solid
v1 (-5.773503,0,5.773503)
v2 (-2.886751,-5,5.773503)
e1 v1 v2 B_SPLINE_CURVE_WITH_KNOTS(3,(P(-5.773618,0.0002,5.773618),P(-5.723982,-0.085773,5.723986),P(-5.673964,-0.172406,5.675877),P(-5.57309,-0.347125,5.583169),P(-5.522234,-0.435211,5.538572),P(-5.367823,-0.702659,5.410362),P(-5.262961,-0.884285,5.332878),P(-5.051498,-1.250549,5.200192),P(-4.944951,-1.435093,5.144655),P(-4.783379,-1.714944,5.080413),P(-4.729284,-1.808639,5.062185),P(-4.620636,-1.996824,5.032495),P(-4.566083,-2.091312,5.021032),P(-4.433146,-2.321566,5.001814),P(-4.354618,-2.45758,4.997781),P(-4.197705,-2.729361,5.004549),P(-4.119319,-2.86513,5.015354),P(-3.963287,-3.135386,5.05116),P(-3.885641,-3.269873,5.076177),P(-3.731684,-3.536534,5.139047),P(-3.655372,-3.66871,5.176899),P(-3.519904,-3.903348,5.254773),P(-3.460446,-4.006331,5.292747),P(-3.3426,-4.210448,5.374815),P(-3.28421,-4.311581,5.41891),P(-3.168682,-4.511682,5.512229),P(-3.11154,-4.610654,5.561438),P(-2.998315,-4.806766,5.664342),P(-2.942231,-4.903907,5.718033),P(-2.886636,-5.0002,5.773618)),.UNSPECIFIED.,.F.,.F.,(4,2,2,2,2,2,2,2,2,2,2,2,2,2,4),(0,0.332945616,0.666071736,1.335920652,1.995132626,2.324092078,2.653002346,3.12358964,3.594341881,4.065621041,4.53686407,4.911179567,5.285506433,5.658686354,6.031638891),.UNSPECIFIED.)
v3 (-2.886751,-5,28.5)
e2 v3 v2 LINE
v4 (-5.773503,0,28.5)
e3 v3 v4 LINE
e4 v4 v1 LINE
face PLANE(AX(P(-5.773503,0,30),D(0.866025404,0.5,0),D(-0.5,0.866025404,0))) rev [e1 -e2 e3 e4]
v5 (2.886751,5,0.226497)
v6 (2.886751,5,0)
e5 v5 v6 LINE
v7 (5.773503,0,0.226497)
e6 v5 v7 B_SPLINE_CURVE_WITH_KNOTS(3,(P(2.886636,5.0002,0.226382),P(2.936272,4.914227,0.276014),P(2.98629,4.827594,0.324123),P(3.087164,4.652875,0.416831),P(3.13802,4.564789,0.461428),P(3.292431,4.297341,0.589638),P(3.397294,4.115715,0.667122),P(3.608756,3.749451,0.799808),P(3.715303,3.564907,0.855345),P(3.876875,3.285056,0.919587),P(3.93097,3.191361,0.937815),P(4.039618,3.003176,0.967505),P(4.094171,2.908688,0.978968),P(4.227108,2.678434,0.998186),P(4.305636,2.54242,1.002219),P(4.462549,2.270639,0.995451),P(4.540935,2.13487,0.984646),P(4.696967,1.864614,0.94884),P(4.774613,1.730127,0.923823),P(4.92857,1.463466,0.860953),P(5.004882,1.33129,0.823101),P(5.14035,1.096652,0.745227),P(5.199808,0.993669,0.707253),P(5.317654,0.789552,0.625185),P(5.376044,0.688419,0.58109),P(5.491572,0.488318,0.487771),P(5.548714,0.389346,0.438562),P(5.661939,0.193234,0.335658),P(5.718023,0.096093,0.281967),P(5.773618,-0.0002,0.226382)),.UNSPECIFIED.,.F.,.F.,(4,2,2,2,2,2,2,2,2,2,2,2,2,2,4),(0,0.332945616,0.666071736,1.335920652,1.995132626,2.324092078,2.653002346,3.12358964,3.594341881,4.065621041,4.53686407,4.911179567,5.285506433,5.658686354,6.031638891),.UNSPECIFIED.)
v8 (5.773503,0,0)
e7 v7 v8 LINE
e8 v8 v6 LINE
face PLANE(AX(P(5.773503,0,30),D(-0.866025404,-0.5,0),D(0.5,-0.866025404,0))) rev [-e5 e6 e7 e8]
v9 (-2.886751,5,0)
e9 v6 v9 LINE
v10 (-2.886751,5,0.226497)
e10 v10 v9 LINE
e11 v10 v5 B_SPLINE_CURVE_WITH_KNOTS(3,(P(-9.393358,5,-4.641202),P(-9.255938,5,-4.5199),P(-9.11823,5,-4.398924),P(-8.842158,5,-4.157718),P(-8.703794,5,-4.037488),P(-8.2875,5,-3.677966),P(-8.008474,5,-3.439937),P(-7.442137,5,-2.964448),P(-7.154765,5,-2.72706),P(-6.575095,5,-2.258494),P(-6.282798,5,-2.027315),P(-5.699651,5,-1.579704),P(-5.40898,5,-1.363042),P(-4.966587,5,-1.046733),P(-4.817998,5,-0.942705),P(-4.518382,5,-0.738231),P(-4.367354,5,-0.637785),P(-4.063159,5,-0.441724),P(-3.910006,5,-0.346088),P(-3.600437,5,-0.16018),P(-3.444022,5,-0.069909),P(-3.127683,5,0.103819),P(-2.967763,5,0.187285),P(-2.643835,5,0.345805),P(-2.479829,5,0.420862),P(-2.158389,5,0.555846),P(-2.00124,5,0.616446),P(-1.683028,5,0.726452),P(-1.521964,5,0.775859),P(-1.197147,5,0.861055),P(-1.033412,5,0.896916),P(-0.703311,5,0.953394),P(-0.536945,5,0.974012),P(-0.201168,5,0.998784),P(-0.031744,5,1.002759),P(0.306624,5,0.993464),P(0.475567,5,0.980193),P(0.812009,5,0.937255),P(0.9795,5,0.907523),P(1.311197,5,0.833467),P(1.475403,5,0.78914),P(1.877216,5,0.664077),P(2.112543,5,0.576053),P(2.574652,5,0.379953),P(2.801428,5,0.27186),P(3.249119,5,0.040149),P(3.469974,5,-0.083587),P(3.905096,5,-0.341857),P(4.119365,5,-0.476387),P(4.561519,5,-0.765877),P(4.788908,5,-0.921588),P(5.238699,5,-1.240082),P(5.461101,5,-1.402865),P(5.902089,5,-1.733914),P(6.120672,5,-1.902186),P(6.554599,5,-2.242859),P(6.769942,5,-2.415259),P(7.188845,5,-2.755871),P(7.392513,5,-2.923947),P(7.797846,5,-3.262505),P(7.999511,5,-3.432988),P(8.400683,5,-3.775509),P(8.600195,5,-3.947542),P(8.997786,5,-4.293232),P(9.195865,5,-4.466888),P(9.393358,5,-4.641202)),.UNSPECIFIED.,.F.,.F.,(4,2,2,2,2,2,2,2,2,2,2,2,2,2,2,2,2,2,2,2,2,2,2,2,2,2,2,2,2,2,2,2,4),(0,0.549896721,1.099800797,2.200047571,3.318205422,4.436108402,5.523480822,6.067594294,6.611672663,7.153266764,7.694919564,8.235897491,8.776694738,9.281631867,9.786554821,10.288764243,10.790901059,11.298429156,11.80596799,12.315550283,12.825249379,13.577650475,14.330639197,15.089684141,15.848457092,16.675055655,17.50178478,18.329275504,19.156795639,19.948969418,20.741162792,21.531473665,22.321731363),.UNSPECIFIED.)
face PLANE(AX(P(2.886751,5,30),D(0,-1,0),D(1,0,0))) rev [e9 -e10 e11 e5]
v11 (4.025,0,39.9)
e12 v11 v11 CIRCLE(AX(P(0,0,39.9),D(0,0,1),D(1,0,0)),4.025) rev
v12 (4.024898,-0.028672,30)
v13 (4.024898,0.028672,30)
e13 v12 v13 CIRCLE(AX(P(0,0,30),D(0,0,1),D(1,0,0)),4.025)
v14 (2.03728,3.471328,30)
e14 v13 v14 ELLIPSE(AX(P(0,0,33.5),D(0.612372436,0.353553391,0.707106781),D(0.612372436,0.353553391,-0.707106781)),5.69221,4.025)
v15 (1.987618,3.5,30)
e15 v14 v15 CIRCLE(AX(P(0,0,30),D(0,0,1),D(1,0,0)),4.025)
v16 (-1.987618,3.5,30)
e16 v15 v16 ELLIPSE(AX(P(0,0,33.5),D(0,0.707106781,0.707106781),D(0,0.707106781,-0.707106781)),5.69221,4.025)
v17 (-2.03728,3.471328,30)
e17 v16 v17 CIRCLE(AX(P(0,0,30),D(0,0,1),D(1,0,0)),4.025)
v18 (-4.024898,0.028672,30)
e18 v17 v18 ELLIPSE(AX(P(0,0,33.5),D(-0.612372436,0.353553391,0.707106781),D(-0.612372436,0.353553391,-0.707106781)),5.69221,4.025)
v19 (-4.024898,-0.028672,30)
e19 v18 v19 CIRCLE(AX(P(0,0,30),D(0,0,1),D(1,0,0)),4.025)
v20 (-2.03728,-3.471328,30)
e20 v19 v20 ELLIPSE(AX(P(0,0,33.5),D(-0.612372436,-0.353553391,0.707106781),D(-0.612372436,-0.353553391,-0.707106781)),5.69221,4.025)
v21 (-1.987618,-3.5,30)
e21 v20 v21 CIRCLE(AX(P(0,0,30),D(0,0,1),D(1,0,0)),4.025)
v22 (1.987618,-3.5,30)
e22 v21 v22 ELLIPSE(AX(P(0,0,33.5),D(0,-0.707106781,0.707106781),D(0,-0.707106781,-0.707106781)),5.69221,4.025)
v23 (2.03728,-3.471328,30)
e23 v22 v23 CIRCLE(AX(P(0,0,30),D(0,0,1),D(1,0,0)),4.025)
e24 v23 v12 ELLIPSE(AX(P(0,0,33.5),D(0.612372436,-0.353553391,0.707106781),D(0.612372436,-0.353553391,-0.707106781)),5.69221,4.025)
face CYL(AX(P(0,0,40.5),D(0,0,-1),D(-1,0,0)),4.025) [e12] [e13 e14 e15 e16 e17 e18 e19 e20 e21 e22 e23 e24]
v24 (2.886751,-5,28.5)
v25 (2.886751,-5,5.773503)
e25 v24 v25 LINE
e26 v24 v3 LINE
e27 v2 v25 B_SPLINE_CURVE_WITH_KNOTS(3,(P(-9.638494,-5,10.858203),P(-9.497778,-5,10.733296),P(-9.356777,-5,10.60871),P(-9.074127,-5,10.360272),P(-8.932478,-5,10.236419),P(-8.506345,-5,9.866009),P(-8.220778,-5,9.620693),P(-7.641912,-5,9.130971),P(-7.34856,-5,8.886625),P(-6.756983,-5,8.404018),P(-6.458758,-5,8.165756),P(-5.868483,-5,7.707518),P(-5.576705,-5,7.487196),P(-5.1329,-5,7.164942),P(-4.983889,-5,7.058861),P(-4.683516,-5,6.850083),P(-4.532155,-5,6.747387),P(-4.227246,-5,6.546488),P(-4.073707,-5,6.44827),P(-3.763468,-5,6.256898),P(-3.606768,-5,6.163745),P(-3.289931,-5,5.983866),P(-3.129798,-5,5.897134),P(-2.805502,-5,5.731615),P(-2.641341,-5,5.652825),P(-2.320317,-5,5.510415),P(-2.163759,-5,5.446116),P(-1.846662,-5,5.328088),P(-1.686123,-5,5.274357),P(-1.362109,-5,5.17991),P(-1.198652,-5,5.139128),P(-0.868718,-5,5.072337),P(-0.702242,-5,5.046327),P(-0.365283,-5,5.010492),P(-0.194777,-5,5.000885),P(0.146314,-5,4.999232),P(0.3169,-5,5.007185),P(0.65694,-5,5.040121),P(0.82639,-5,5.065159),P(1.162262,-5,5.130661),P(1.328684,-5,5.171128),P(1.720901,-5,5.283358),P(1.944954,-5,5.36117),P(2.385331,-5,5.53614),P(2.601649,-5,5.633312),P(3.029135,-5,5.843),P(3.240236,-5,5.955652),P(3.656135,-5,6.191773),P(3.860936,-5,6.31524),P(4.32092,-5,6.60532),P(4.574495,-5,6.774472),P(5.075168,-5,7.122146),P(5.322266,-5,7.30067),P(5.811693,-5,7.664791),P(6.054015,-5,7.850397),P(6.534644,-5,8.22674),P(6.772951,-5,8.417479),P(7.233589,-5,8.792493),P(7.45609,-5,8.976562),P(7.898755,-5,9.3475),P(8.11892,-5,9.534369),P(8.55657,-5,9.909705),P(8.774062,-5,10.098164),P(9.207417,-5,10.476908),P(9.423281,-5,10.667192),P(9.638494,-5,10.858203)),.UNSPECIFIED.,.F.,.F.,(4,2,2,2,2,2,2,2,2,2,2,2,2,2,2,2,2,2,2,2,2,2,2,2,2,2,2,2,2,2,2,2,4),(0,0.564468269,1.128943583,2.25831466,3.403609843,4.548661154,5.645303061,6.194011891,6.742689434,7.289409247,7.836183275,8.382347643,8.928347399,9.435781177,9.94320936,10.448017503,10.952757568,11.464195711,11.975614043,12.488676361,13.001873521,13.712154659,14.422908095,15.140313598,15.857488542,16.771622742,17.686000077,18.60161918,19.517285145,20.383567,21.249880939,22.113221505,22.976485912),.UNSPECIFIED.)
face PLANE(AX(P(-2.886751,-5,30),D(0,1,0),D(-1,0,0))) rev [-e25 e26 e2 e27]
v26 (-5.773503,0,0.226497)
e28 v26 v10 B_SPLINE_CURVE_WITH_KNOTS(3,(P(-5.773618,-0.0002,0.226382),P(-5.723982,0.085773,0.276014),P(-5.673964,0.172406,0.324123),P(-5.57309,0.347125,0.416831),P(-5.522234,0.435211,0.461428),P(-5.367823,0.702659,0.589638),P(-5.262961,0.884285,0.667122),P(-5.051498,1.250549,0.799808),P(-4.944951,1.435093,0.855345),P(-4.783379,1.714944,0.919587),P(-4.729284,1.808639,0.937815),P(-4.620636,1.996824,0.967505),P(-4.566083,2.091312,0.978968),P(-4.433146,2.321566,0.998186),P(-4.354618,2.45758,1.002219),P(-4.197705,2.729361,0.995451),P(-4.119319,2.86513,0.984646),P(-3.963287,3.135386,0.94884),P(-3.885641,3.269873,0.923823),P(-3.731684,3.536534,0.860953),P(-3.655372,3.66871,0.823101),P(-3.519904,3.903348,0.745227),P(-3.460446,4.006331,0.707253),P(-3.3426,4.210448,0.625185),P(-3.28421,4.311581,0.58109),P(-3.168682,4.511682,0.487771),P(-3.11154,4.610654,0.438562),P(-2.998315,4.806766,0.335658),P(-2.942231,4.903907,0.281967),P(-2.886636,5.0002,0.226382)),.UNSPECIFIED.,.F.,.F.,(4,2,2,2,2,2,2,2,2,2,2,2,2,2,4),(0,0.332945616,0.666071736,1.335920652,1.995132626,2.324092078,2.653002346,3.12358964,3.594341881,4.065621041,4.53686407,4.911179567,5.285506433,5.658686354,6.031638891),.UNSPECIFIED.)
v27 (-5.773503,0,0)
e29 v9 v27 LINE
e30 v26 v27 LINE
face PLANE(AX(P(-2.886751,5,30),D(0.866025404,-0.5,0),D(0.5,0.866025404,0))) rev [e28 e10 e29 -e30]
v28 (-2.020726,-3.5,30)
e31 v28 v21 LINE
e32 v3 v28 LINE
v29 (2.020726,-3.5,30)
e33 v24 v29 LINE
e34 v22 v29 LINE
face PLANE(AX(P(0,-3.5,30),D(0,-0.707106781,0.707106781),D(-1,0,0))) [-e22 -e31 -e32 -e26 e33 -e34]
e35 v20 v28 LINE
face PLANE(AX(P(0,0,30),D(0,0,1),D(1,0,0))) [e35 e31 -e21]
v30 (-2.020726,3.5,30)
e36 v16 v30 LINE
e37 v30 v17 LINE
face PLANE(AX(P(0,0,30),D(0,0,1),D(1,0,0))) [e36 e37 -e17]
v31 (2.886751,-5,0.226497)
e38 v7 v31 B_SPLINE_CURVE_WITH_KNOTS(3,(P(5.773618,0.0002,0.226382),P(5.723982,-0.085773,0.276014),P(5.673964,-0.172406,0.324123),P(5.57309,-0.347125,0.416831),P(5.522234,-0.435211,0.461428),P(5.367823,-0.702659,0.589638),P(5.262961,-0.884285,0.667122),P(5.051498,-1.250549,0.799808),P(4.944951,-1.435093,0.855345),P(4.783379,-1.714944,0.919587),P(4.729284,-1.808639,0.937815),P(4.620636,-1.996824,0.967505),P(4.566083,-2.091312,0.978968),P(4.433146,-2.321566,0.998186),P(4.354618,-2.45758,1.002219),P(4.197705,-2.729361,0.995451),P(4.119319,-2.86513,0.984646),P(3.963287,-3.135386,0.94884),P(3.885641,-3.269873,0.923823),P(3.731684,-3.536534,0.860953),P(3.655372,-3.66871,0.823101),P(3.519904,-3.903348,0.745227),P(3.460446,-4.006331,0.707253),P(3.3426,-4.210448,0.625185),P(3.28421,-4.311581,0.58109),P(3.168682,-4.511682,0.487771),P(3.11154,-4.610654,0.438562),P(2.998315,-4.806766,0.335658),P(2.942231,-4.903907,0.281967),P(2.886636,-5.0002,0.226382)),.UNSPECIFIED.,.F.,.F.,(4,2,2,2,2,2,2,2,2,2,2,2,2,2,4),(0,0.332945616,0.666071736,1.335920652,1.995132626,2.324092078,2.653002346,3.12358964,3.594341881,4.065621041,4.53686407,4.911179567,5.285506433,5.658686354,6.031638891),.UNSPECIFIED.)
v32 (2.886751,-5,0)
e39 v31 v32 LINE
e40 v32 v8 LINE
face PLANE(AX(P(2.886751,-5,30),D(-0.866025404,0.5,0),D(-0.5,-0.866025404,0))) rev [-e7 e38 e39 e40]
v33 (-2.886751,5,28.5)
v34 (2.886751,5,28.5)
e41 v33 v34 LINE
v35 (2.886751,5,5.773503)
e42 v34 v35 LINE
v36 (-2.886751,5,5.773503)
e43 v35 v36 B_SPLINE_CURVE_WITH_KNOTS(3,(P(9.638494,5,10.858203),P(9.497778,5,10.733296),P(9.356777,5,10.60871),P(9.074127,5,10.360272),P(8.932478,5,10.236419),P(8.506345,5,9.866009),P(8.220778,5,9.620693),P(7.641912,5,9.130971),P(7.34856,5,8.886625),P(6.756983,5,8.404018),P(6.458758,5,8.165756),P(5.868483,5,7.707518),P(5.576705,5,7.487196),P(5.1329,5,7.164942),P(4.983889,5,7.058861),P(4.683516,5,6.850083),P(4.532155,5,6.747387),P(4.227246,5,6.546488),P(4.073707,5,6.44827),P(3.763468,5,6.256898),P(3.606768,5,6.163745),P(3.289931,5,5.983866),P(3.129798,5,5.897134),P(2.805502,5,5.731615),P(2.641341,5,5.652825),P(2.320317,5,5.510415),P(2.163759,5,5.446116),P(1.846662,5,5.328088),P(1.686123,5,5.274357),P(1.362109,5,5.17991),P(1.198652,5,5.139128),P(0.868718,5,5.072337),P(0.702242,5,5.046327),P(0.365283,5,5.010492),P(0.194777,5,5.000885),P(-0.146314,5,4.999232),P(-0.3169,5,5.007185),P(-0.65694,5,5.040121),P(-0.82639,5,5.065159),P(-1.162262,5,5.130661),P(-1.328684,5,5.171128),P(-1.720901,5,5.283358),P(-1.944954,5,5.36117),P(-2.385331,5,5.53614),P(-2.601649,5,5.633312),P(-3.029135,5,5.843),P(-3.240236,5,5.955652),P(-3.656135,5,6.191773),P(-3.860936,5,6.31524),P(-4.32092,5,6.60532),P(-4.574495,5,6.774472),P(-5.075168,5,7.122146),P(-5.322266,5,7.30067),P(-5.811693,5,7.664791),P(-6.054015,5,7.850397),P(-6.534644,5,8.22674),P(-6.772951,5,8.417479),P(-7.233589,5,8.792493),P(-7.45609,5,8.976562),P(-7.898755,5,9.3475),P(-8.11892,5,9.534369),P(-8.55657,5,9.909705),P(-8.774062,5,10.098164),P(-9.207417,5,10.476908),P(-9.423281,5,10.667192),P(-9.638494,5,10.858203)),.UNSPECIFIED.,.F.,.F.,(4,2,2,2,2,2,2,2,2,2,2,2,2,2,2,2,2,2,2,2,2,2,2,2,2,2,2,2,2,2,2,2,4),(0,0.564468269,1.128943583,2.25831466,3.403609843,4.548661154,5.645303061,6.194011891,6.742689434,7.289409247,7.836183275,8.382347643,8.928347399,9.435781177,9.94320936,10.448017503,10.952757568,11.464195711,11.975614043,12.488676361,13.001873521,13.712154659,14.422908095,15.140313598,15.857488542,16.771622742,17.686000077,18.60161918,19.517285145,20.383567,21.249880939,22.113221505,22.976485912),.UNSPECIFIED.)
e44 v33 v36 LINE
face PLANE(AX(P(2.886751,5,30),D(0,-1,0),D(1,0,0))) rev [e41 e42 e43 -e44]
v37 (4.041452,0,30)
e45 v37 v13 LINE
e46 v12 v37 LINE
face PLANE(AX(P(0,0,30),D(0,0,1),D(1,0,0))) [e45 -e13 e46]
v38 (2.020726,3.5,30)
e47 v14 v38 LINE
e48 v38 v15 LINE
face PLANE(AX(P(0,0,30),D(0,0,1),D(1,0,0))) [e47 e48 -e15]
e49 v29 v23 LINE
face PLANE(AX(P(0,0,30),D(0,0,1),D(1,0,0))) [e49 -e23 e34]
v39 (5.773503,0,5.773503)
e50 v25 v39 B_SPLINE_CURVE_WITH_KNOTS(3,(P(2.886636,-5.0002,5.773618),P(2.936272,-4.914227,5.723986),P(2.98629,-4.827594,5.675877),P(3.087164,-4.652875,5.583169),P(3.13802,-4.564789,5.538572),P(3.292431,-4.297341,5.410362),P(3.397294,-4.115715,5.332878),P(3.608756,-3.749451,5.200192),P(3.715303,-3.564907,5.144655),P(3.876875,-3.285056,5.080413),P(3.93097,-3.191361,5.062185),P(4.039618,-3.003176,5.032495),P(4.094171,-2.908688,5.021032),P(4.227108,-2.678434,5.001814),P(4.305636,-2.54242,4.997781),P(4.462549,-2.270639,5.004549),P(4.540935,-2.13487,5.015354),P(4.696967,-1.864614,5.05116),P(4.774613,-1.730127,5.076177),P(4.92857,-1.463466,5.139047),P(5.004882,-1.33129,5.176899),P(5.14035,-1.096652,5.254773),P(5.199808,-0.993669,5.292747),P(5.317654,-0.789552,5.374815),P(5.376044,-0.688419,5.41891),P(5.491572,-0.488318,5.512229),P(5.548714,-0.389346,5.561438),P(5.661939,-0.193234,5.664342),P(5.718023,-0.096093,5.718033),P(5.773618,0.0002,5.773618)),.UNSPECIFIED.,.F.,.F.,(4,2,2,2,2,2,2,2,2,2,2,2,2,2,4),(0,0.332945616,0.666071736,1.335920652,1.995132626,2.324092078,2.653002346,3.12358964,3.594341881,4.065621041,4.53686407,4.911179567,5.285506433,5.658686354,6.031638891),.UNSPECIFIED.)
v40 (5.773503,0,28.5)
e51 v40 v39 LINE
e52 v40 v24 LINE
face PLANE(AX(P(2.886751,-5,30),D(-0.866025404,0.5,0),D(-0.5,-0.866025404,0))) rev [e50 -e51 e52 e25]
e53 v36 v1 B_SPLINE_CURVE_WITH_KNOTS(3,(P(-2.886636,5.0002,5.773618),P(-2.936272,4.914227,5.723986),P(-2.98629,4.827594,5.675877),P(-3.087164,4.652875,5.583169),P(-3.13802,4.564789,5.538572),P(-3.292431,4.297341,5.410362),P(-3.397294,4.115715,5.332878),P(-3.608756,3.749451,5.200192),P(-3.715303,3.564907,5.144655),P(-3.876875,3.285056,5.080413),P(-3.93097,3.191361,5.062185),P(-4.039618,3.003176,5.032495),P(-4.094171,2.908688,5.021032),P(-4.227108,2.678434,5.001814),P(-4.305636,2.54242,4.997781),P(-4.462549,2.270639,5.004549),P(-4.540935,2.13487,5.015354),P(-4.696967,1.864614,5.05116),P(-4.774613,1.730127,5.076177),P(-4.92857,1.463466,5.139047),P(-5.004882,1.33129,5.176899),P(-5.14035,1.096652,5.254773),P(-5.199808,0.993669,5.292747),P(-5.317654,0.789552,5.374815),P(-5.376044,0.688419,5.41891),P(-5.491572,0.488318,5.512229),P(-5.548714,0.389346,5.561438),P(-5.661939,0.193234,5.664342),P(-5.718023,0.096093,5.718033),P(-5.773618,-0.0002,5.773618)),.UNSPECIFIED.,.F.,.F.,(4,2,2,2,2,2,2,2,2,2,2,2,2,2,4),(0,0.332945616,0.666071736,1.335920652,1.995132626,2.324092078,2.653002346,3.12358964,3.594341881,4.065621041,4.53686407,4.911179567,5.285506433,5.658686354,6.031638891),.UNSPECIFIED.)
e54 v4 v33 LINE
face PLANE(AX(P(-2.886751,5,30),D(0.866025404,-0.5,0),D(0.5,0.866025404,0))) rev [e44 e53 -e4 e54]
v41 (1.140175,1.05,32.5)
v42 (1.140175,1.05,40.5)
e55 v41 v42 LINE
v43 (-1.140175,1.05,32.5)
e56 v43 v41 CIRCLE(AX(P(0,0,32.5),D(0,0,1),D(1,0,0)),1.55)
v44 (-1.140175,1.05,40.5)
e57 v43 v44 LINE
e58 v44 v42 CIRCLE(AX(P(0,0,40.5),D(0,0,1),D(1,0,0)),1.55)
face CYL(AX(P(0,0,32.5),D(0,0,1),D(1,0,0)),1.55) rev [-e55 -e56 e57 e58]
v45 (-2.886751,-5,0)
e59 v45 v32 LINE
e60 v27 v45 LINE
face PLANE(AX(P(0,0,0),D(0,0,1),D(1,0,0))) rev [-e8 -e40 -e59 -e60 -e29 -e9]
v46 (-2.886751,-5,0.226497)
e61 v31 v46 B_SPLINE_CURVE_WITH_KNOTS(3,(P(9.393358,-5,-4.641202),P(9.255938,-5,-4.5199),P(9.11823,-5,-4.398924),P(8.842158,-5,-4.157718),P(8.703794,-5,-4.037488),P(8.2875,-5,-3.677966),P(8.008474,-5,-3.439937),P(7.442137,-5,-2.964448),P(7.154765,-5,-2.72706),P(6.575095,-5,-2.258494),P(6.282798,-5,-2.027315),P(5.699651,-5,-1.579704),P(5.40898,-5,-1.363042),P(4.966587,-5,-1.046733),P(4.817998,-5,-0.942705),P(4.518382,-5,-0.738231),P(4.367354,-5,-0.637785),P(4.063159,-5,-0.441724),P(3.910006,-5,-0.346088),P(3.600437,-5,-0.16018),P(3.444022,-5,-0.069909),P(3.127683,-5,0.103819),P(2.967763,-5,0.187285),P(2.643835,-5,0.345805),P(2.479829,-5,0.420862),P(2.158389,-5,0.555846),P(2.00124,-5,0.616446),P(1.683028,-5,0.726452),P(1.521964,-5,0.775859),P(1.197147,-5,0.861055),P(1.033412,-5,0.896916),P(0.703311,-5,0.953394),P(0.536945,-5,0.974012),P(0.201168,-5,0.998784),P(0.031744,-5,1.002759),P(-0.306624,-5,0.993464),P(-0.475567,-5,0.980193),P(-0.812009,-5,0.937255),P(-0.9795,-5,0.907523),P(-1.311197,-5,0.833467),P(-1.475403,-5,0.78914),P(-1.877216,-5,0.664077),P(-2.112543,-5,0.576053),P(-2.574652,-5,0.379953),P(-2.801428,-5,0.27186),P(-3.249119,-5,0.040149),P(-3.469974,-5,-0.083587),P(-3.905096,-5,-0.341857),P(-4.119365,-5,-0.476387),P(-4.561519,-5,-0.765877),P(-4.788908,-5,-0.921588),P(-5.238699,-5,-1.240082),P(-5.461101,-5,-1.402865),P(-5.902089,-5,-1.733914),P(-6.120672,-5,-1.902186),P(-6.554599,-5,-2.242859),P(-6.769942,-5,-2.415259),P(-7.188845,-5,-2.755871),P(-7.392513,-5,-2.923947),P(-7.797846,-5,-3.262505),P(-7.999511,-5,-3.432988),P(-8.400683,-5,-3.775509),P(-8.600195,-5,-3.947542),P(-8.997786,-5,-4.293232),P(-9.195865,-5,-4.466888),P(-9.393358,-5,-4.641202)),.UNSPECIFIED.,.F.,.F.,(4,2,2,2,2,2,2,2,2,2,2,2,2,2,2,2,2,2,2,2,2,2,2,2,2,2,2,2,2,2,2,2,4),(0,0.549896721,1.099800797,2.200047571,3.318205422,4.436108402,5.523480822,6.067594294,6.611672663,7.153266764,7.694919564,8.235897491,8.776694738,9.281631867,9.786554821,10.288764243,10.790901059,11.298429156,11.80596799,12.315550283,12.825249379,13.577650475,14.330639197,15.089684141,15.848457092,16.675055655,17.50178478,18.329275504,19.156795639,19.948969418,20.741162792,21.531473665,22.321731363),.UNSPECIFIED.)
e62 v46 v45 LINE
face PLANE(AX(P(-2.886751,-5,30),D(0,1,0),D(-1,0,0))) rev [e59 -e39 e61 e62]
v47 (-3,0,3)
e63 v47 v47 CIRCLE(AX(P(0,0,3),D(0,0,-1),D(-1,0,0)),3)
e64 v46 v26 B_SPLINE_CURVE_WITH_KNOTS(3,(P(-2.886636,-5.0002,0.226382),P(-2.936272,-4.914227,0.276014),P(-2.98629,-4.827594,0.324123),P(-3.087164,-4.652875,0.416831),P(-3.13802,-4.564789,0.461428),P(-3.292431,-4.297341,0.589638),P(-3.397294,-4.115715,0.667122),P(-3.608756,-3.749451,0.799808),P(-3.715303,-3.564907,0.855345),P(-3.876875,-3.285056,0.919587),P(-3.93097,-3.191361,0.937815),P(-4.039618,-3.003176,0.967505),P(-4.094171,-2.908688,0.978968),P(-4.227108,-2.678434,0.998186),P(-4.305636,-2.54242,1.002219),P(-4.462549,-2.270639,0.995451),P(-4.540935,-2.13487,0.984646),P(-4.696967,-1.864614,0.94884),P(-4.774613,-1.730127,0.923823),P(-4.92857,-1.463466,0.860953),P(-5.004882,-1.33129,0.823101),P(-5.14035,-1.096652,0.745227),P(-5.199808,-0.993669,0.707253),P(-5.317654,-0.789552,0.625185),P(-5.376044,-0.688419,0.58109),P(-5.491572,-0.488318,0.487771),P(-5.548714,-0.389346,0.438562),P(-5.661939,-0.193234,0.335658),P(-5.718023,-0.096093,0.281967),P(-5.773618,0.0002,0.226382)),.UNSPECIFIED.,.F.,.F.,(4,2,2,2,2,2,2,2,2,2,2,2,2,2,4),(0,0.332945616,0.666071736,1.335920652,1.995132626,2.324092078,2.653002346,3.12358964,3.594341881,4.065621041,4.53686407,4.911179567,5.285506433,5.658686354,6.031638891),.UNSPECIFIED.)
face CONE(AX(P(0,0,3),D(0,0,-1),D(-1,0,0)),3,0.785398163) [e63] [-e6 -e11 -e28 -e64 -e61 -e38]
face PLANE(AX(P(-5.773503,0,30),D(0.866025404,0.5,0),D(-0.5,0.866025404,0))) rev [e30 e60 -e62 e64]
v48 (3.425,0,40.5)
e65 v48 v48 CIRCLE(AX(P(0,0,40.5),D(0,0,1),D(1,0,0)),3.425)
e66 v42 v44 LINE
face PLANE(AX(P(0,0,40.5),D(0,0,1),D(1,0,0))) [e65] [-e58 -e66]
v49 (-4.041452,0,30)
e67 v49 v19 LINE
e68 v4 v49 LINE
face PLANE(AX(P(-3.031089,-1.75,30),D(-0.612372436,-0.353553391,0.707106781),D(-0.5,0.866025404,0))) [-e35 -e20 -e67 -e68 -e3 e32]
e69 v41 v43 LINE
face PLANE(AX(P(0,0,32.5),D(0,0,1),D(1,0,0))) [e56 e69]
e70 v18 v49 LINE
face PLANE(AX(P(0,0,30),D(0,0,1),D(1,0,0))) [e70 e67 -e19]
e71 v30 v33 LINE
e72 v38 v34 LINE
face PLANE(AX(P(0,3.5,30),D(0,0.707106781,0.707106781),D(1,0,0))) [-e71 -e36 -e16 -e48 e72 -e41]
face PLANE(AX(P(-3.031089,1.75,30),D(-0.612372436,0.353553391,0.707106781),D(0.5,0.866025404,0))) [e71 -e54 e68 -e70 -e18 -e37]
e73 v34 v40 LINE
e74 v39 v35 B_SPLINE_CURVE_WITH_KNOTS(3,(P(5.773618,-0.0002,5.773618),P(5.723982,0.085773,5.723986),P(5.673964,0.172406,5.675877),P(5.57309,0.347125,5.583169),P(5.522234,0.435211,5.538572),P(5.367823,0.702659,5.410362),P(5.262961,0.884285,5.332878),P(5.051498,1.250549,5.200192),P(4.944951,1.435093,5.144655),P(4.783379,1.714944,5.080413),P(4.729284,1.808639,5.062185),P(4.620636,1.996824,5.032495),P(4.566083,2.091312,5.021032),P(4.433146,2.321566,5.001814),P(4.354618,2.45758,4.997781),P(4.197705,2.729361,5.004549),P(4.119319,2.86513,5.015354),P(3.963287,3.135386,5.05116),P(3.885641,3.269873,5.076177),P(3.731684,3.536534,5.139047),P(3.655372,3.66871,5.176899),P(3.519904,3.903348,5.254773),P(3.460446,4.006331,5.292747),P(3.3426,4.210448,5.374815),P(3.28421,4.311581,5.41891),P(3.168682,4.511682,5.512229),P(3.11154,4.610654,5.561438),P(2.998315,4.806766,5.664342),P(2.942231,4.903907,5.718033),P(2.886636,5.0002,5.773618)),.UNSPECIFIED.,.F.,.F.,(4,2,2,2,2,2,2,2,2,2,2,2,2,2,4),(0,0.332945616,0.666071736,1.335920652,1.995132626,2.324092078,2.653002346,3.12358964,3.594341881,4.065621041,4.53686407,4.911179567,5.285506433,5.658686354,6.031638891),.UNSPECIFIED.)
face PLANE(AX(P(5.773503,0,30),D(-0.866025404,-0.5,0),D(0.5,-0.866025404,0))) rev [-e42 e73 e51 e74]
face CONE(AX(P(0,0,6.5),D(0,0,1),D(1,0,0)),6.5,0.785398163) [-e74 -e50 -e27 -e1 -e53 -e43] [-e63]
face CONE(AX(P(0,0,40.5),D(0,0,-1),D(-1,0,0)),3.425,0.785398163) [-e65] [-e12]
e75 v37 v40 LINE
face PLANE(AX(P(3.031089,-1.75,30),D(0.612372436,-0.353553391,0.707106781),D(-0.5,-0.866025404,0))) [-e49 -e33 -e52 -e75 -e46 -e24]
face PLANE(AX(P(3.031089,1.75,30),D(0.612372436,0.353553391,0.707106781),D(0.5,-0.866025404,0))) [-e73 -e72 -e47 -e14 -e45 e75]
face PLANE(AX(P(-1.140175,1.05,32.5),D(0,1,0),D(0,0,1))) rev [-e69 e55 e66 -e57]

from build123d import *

# Parameters (mm, degrees)
EXTRUDE_1_DEPTH     = 30
SKETCH_2_R          = 4.025
EXTRUDE_2_DEPTH     = 10.5
CHAMFER_1_SIZE      = 0.6
CUT_EXTRUDE_1_DEPTH = 8
CHAMFER_2_SIZE      = 1.5


with BuildPart() as part:
    # 草图1 → 凸台-拉伸1 (new body)
    with BuildSketch(Plane.XY):
        Polygon((5.773502692, 0), (2.886751346, 5), (-2.886751346, 5), (-5.773502692, 0), (-2.886751346, -5), (2.886751346, -5), align=None)
    extrude(amount=EXTRUDE_1_DEPTH)

    # 草图2 → 凸台-拉伸2 (add)
    with BuildSketch(Plane.XY.offset(30)):
        with Locations(Location((0, 0, 0), (0, 0, 180))):
            Circle(SKETCH_2_R)
    extrude(amount=EXTRUDE_2_DEPTH)

    # 倒角1
    chamfer_1_edges = [part.edges().sort_by_distance(p)[0] for p in [
        (4.025, 0, 40.5),
    ]]
    chamfer(chamfer_1_edges, length=CHAMFER_1_SIZE)

    # 草图3 → 切除-拉伸1 (cut)
    with BuildSketch(Plane.XY.offset(40.5)):
        with BuildLine():
            Line((-1.140175425, 1.05), (1.140175425, 1.05))
            ThreePointArc((1.140175425, 1.05), (0, -1.55), (-1.140175425, 1.05))
        make_face()
    extrude(amount=-CUT_EXTRUDE_1_DEPTH, mode=Mode.SUBTRACT)

    # 倒角2
    # the kernel refuses this chamfer: 1.5 mm, written as the material it takes off along each edge
    with BuildSketch(Plane(origin=(6.744275828, 5, 30), x_dir=(3.229355886475551e-15, -0.9996219169112968, 0.027495876610586775), z_dir=(-1, 0, 0))) as chamfer_2_piece_1_section:
        Polygon((CHAMFER_2_SIZE * 0.999621916911, -CHAMFER_2_SIZE * 0.0274958766106), (-CHAMFER_2_SIZE * 0.0274958766106, -CHAMFER_2_SIZE * 0.999621916911), (0, 0), align=None)
    chamfer_2_piece_1 = extrude(amount=13.488551656, mode=Mode.PRIVATE)
    chamfer_2_piece_1 = chamfer_2_piece_1 - Plane(origin=(0, 0, 29.496283425), x_dir=(-1, 0, 0), z_dir=(0, 0, -1)) * Cylinder(4.025, 33, mode=Mode.PRIVATE)
    add(chamfer_2_piece_1, mode=Mode.SUBTRACT)
    with BuildSketch(Plane(origin=(-0.957989105, 8.340714197, 30), x_dir=(0.865697974224883, -0.49981095845564333, 0.02749587661058677), z_dir=(-0.49999999999999506, -0.8660254037844416, 0))) as chamfer_2_piece_2_section:
        Polygon((CHAMFER_2_SIZE * 0.999621916911, -CHAMFER_2_SIZE * 0.0274958766106), (-CHAMFER_2_SIZE * 0.0274958766106, -CHAMFER_2_SIZE * 0.999621916911), (0, 0), align=None)
    chamfer_2_piece_2 = extrude(amount=13.488551656, mode=Mode.PRIVATE)
    chamfer_2_piece_2 = chamfer_2_piece_2 - Plane(origin=(0, 0, 29.496283425), x_dir=(-1, 0, 0), z_dir=(0, 0, -1)) * Cylinder(4.025, 33, mode=Mode.PRIVATE)
    add(chamfer_2_piece_2, mode=Mode.SUBTRACT)
    with BuildSketch(Plane(origin=(-7.702264933, 3.340714197, 30), x_dir=(0.8656979742248763, 0.49981095845565543, 0.02749587661058678), z_dir=(0.5000000000000071, -0.8660254037844346, 0))) as chamfer_2_piece_3_section:
        Polygon((CHAMFER_2_SIZE * 0.999621916911, -CHAMFER_2_SIZE * 0.0274958766106), (-CHAMFER_2_SIZE * 0.0274958766106, -CHAMFER_2_SIZE * 0.999621916911), (0, 0), align=None)
    chamfer_2_piece_3 = extrude(amount=13.488551656, mode=Mode.PRIVATE)
    chamfer_2_piece_3 = chamfer_2_piece_3 - Plane(origin=(0, 0, 29.496283426), x_dir=(-1, 0, 0), z_dir=(0, 0, -1)) * Cylinder(4.025, 33, mode=Mode.PRIVATE)
    add(chamfer_2_piece_3, mode=Mode.SUBTRACT)
    with BuildSketch(Plane(origin=(-6.744275828, -5, 30), x_dir=(-1.061074076984824e-14, 0.9996219169112968, 0.027495876610586775), z_dir=(1, 0, 0))) as chamfer_2_piece_4_section:
        Polygon((CHAMFER_2_SIZE * 0.999621916911, -CHAMFER_2_SIZE * 0.0274958766106), (-CHAMFER_2_SIZE * 0.0274958766106, -CHAMFER_2_SIZE * 0.999621916911), (0, 0), align=None)
    chamfer_2_piece_4 = extrude(amount=13.488551656, mode=Mode.PRIVATE)
    chamfer_2_piece_4 = chamfer_2_piece_4 - Plane(origin=(0, 0, 29.496283425), x_dir=(-1, 0, 0), z_dir=(0, 0, -1)) * Cylinder(4.025, 33, mode=Mode.PRIVATE)
    add(chamfer_2_piece_4, mode=Mode.SUBTRACT)
    with BuildSketch(Plane(origin=(0.957989105, -8.340714197, 30), x_dir=(-0.865697974224883, 0.49981095845564333, 0.02749587661058677), z_dir=(0.49999999999999506, 0.8660254037844416, 0))) as chamfer_2_piece_5_section:
        Polygon((CHAMFER_2_SIZE * 0.999621916911, -CHAMFER_2_SIZE * 0.0274958766106), (-CHAMFER_2_SIZE * 0.0274958766106, -CHAMFER_2_SIZE * 0.999621916911), (0, 0), align=None)
    chamfer_2_piece_5 = extrude(amount=13.488551656, mode=Mode.PRIVATE)
    chamfer_2_piece_5 = chamfer_2_piece_5 - Plane(origin=(0, 0, 29.496283425), x_dir=(-1, 0, 0), z_dir=(0, 0, -1)) * Cylinder(4.025, 33, mode=Mode.PRIVATE)
    add(chamfer_2_piece_5, mode=Mode.SUBTRACT)
    with BuildSketch(Plane(origin=(7.702264933, -3.340714197, 30), x_dir=(-0.8656979742248796, -0.4998109584556494, 0.02749587661058677), z_dir=(-0.5000000000000011, 0.866025403784438, 0))) as chamfer_2_piece_6_section:
        Polygon((CHAMFER_2_SIZE * 0.999621916911, -CHAMFER_2_SIZE * 0.0274958766106), (-CHAMFER_2_SIZE * 0.0274958766106, -CHAMFER_2_SIZE * 0.999621916911), (0, 0), align=None)
    chamfer_2_piece_6 = extrude(amount=13.488551656, mode=Mode.PRIVATE)
    chamfer_2_piece_6 = chamfer_2_piece_6 - Plane(origin=(0, 0, 29.496283425), x_dir=(-1, 0, 0), z_dir=(0, 0, -1)) * Cylinder(4.025, 33, mode=Mode.PRIVATE)
    add(chamfer_2_piece_6, mode=Mode.SUBTRACT)

    # 草图4 → 切除-旋转4 (revolve, cut)
    with BuildSketch(Plane(origin=(0, 0, 0), x_dir=(0, 0, -1), z_dir=(1, 0, 0)), mode=Mode.PRIVATE) as cut_revolve_4_sk:
        Polygon((-6.5, 6.5), (0.5, 6.5), (-3, 3), align=None)
    revolve(cut_revolve_4_sk.sketch.rotate(Axis((0, 0, -6.39558723), (0, 0, 1)), 89.591845794), axis=Axis((0, 0, -6.39558723), (0, 0, 1)), mode=Mode.SUBTRACT)


solid = part.part
